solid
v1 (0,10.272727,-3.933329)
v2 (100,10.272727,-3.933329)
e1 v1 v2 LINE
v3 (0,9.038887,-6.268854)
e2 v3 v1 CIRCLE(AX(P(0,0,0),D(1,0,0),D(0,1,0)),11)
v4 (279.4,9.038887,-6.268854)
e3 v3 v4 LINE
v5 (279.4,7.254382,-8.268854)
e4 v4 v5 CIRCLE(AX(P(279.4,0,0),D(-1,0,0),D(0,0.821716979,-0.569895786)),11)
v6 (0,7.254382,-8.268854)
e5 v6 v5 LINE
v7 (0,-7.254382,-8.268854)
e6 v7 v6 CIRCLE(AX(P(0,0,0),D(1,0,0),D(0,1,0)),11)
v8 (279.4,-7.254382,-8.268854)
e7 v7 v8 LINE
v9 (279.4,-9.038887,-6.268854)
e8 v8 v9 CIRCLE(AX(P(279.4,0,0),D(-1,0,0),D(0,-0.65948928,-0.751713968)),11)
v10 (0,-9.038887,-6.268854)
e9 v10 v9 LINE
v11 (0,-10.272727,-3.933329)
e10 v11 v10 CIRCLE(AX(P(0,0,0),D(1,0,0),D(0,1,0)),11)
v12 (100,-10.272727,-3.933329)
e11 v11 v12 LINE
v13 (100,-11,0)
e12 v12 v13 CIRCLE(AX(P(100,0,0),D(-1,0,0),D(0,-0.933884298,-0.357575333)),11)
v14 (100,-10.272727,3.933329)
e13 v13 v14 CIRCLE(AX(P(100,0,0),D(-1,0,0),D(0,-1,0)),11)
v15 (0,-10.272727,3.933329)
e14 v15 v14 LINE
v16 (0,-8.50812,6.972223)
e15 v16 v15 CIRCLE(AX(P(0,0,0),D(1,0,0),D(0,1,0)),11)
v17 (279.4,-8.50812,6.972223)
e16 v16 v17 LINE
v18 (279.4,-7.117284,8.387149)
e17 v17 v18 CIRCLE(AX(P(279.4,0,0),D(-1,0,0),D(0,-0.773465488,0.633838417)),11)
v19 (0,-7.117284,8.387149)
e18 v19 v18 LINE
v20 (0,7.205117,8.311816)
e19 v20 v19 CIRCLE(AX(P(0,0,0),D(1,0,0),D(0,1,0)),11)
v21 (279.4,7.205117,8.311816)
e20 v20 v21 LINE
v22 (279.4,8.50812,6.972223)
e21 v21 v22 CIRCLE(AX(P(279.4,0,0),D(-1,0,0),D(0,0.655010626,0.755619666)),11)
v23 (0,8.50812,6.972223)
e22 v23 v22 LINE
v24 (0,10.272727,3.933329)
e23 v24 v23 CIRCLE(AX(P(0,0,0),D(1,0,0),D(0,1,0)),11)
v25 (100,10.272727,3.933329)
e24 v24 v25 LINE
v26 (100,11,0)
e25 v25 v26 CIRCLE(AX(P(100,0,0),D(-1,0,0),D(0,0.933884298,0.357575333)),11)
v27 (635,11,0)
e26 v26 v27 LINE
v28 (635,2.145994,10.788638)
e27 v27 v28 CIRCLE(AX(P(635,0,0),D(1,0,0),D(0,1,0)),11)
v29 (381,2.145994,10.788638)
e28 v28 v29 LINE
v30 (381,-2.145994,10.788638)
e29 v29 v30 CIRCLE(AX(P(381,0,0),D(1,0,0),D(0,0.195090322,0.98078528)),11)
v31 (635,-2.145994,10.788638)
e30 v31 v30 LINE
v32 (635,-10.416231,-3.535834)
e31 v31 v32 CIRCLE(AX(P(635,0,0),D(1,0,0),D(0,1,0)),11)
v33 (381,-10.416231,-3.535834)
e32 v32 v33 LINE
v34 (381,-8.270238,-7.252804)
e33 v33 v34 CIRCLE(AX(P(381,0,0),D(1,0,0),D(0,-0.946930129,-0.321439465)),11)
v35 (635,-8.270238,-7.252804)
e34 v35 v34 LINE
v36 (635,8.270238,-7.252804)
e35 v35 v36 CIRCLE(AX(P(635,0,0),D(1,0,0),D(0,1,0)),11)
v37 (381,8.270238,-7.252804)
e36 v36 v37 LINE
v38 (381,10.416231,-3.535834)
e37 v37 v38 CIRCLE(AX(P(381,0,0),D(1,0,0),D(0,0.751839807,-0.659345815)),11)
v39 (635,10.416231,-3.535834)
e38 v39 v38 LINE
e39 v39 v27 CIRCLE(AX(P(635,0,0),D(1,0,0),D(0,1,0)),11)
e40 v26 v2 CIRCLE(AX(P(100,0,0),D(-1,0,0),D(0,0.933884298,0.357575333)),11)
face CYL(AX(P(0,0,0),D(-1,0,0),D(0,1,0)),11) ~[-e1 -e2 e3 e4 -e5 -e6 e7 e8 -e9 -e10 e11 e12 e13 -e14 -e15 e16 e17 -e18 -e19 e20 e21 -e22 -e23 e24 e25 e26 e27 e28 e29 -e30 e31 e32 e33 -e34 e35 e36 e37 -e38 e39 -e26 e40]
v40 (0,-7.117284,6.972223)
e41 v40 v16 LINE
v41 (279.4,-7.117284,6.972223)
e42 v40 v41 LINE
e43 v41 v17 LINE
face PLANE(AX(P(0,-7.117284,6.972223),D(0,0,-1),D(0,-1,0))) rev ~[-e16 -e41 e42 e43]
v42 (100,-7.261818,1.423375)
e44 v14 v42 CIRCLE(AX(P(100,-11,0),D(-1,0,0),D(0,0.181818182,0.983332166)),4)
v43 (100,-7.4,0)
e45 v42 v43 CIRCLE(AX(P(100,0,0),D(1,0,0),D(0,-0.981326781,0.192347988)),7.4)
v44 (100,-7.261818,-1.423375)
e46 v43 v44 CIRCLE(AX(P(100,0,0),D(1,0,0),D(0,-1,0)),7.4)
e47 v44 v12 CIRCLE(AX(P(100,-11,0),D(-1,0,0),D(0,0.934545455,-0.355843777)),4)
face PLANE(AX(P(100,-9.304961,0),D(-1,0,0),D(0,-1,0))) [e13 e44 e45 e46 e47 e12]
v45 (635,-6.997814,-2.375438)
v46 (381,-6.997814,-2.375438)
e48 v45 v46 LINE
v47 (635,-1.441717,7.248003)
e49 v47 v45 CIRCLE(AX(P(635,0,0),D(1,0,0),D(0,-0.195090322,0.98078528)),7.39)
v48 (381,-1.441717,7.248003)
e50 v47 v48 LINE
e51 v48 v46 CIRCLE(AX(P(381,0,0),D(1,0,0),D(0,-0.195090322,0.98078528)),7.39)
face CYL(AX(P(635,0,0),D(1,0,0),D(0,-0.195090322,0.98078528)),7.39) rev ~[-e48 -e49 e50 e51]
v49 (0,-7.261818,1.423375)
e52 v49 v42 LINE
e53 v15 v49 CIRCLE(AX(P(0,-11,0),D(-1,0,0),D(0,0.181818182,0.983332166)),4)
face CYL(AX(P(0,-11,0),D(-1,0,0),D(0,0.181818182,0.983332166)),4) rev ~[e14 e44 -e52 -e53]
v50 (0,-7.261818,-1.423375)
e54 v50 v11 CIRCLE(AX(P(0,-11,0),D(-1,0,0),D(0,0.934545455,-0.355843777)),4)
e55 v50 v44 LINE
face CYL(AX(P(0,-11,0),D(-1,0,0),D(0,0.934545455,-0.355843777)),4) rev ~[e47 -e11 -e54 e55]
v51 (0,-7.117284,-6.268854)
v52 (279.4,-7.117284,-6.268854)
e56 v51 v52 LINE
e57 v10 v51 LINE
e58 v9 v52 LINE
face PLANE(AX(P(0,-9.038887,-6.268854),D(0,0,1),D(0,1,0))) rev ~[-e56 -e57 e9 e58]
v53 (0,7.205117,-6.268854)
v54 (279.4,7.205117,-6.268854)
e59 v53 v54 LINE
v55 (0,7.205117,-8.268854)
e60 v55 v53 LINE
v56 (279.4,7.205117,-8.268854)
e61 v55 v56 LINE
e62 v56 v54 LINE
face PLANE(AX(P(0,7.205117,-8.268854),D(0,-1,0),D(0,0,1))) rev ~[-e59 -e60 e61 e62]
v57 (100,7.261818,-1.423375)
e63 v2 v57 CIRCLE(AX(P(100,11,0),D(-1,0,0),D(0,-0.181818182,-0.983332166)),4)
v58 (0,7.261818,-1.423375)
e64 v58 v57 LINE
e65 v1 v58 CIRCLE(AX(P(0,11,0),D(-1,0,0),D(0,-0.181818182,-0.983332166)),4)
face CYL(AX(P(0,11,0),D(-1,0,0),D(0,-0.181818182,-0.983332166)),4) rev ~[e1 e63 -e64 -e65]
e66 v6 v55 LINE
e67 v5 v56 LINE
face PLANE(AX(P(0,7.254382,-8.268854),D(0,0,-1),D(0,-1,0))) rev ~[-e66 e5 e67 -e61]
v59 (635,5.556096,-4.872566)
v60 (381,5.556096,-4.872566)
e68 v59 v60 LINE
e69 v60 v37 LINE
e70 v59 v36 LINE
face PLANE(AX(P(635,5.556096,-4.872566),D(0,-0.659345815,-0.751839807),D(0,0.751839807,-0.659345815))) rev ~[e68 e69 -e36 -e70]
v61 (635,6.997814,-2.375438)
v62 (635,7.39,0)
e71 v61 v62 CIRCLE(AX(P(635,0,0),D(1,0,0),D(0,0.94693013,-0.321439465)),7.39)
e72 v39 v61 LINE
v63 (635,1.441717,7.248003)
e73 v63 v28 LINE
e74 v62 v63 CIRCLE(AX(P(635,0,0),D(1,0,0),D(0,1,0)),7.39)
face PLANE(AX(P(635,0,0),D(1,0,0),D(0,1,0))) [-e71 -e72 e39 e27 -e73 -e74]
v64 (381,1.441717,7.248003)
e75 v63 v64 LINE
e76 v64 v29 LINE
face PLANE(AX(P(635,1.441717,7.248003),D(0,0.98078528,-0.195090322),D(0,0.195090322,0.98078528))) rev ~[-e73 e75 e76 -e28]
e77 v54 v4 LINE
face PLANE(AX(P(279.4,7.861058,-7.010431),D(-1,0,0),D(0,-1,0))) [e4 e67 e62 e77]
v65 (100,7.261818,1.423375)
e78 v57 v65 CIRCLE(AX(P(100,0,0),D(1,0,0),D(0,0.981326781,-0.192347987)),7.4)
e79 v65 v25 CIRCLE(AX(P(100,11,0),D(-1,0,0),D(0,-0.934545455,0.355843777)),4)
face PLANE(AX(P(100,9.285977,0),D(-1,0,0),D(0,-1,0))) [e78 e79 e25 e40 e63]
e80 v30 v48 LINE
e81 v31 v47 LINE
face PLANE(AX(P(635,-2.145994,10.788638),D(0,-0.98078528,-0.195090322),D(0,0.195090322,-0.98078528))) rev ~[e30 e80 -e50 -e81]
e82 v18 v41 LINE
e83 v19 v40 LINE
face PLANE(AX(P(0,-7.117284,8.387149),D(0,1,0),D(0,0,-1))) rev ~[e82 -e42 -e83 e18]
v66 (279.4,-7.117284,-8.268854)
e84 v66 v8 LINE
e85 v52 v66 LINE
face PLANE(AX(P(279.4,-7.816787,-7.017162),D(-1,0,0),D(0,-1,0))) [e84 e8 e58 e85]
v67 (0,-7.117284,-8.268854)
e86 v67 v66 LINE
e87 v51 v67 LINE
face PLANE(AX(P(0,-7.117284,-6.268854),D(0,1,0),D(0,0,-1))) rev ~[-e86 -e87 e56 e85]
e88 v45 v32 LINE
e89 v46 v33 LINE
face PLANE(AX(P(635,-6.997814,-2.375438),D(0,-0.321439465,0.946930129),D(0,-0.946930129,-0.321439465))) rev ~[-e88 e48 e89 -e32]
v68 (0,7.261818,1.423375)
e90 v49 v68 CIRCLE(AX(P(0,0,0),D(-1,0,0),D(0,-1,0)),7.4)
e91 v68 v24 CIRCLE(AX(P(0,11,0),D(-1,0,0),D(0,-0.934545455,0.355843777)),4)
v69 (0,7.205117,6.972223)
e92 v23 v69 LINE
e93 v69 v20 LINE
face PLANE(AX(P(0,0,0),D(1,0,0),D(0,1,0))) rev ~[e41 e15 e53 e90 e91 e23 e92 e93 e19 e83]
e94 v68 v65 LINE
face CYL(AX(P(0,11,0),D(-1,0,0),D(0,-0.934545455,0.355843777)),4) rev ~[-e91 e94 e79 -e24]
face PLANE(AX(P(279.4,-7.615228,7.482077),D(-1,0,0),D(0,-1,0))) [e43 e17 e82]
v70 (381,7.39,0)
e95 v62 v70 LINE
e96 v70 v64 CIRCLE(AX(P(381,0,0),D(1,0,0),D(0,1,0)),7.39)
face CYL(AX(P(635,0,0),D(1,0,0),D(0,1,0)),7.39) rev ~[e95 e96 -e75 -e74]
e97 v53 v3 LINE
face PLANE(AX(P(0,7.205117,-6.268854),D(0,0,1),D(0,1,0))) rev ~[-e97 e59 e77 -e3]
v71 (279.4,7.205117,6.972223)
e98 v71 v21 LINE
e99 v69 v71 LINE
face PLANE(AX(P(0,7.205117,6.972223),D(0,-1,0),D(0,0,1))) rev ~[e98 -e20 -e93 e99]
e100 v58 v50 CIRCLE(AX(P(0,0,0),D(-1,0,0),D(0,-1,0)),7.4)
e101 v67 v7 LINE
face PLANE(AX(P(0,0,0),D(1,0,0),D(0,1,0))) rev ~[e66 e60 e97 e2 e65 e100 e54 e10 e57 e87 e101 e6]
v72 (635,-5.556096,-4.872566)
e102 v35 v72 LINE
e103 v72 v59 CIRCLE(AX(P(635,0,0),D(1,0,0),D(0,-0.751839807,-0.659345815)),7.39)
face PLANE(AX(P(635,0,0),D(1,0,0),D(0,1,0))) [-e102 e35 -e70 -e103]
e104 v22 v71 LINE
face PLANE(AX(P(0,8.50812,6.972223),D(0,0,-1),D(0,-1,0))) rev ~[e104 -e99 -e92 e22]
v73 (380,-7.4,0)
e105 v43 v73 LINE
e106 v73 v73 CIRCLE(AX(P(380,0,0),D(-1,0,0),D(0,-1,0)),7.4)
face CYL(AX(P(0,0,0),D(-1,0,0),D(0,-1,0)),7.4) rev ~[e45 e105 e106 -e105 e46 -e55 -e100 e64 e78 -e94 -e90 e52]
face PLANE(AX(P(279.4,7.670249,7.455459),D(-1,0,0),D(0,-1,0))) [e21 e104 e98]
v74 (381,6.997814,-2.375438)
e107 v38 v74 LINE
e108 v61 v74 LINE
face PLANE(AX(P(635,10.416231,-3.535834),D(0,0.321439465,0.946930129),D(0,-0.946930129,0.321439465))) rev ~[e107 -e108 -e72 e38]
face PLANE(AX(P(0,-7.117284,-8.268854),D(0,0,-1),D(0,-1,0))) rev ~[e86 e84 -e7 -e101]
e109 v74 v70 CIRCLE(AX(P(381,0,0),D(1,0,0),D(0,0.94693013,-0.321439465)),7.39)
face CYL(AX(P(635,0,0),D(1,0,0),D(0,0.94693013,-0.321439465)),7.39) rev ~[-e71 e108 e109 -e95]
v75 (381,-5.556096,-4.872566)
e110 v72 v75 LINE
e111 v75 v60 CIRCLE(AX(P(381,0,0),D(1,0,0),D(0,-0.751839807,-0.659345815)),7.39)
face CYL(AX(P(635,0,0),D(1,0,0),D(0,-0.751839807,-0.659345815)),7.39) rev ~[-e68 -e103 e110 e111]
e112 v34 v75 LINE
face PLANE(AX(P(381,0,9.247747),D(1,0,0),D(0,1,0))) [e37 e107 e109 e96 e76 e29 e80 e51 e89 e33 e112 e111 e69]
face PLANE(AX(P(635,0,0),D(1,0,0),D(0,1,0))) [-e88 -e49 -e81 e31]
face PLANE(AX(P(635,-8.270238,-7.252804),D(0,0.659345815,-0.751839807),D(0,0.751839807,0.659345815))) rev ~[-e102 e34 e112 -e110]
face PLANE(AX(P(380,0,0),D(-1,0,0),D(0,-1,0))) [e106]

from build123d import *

# Parameters (mm, degrees)
F0_R     = 11
F1_DEPTH = 635
F3_DEPTH = 254
F4_R     = 7.4
F5_DEPTH = 380
F7_DEPTH = 279.4
F8_DEPTH = 100


with BuildPart() as f1:
    # F0 (on Right) → F1 (new body)
    with BuildSketch(Plane.YZ):
        Circle(F0_R)
    extrude(amount=F1_DEPTH)

    # F2 (on face) → F3 (cut)
    with BuildSketch(Plane.YZ.offset(635)):
        with BuildLine():
            ThreePointArc((0, 7.39), (0.724346667, 7.3544151301), (1.4417174797, 7.2480032222))
            Line((1.4417174797, 7.2480032222), (2.1459935422, 10.7886380844))
            ThreePointArc((2.1459935422, 10.7886380844), (0, 11), (-2.1459935422, 10.7886380844))
            Line((-2.1459935422, 10.7886380844), (-1.4417174797, 7.2480032222))
            ThreePointArc((-1.4417174797, 7.2480032222), (-0.724346667, 7.3544151301), (0, 7.39))
        make_face()
        with BuildLine():
            Line((-6.997813657, -2.3754376486), (0, 0))
            Line((0, 0), (-1.4417174797, 7.2480032222))
            ThreePointArc((-1.4417174797, 7.2480032222), (-6.399927734, 3.695), (-6.997813657, -2.3754376486))
        make_face()
        with BuildLine():
            Line((-5.5560961773, -4.8725655736), (0, 0))
            Line((0, 0), (-6.997813657, -2.3754376486))
            ThreePointArc((-6.997813657, -2.3754376486), (-6.399927734, -3.695), (-5.5560961773, -4.8725655736))
        make_face()
        with BuildLine():
            Line((5.5560961773, -4.8725655736), (0, 0))
            Line((0, 0), (-5.5560961773, -4.8725655736))
            ThreePointArc((-5.5560961773, -4.8725655736), (0, -7.39), (5.5560961773, -4.8725655736))
        make_face()
        with BuildLine():
            ThreePointArc((5.5560961773, -4.8725655736), (6.399927734, -3.695), (6.997813657, -2.3754376486))
            Line((6.997813657, -2.3754376486), (0, 0))
            Line((0, 0), (5.5560961773, -4.8725655736))
        make_face()
        with BuildLine():
            ThreePointArc((6.997813657, -2.3754376486), (7.2912942241, -1.2037975484), (7.39, 0))
            ThreePointArc((7.39, 0), (5.7125472504, 4.68816637), (1.4417174797, 7.2480032222))
            Line((1.4417174797, 7.2480032222), (0, 0))
            Line((0, 0), (6.997813657, -2.3754376486))
        make_face()
        with BuildLine():
            Line((0, 0), (1.4417174797, 7.2480032222))
            ThreePointArc((1.4417174797, 7.2480032222), (0.724346667, 7.3544151301), (0, 7.39))
            Line((0, 7.39), (0, 0))
        make_face()
        with BuildLine():
            Line((0, 0), (0, 7.39))
            ThreePointArc((0, 7.39), (-0.724346667, 7.3544151301), (-1.4417174797, 7.2480032222))
            Line((-1.4417174797, 7.2480032222), (0, 0))
        make_face()
        with BuildLine():
            ThreePointArc((-5.5560961773, -4.8725655736), (-6.399927734, -3.695), (-6.997813657, -2.3754376486))
            Line((-6.997813657, -2.3754376486), (-10.4162314244, -3.5358341183))
            ThreePointArc((-10.4162314244, -3.5358341183), (-9.5262794416, -5.5), (-8.2702378823, -7.2528039661))
            Line((-8.2702378823, -7.2528039661), (-5.5560961773, -4.8725655736))
        make_face()
        with BuildLine():
            Line((10.4162314244, -3.5358341183), (6.997813657, -2.3754376486))
            ThreePointArc((6.997813657, -2.3754376486), (6.399927734, -3.695), (5.5560961773, -4.8725655736))
            Line((5.5560961773, -4.8725655736), (8.2702378823, -7.2528039661))
            ThreePointArc((8.2702378823, -7.2528039661), (9.5262794416, -5.5), (10.4162314244, -3.5358341183))
        make_face()
    extrude(amount=-F3_DEPTH, mode=Mode.SUBTRACT)

    # F4 (on face) → F5 (cut)
    with BuildSketch(Plane(origin=(0, 0, 0), x_dir=(0, -1, 0), z_dir=(-1, 0, 0))):
        Circle(F4_R)
    extrude(amount=-F5_DEPTH, mode=Mode.SUBTRACT)

    # F6 (on face) → F7 (cut)
    with BuildSketch(Plane(origin=(0, 0, 0), x_dir=(0, -1, 0), z_dir=(-1, 0, 0))):
        with BuildLine():
            Line((7.1172844619, 8.3871486149), (7.1172844619, 6.972222589))
            Line((7.1172844619, 6.972222589), (8.5081203665, 6.972222589))
            ThreePointArc((8.5081203665, 6.972222589), (7.8446684396, 7.7111073831), (7.1172844619, 8.3871486149))
        make_face()
        with BuildLine():
            ThreePointArc((-9.0388867634, -6.2688536495), (-8.2077799909, -7.3234109281), (-7.2543820773, -8.2688536495))
            Line((-7.2543820773, -8.2688536495), (-7.2051168904, -8.2688536495))
            Line((-7.2051168904, -8.2688536495), (-7.2051168904, -6.2688536495))
            Line((-7.2051168904, -6.2688536495), (-9.0388867634, -6.2688536495))
        make_face()
        with BuildLine():
            ThreePointArc((7.2543820773, -8.2688536495), (8.2077799909, -7.3234109281), (9.0388867634, -6.2688536495))
            Line((9.0388867634, -6.2688536495), (7.1172844619, -6.2688536495))
            Line((7.1172844619, -6.2688536495), (7.1172844619, -8.2688536495))
            Line((7.1172844619, -8.2688536495), (7.2543820773, -8.2688536495))
        make_face()
        with BuildLine():
            Line((-7.2051168904, 6.972222589), (-7.2051168904, 8.3118163235))
            ThreePointArc((-7.2051168904, 8.3118163235), (-7.8851178885, 7.6697402749), (-8.5081203665, 6.972222589))
            Line((-8.5081203665, 6.972222589), (-7.2051168904, 6.972222589))
        make_face()
    extrude(amount=-F7_DEPTH, mode=Mode.SUBTRACT)

    # F6 (on face) → F8 (cut)
    with BuildSketch(Plane(origin=(0, 0, 0), x_dir=(0, -1, 0), z_dir=(-1, 0, 0))):
        with BuildLine():
            ThreePointArc((11, 0), (10.8166538264, 2), (10.2727272727, 3.9333286641))
            ThreePointArc((10.2727272727, 3.9333286641), (8.4387429279, 3.0724521494), (7.2618181818, 1.4233751066))
            ThreePointArc((7.2618181818, 1.4233751066), (7.3653735325, 0.7150333749), (7.4, 0))
            ThreePointArc((7.4, 0), (7.3653735325, -0.7150333749), (7.2618181818, -1.4233751066))
            ThreePointArc((7.2618181818, -1.4233751066), (8.4387429279, -3.0724521494), (10.2727272727, -3.9333286641))
            ThreePointArc((10.2727272727, -3.9333286641), (10.8166538264, -2), (11, 0))
        make_face()
        with BuildLine():
            ThreePointArc((-7.2618181818, -1.4233751066), (-7.4, 0), (-7.2618181818, 1.4233751066))
            ThreePointArc((-7.2618181818, 1.4233751066), (-8.4387429279, 3.0724521494), (-10.2727272727, 3.9333286641))
            ThreePointArc((-10.2727272727, 3.9333286641), (-11, 0), (-10.2727272727, -3.9333286641))
            ThreePointArc((-10.2727272727, -3.9333286641), (-8.4387429279, -3.0724521494), (-7.2618181818, -1.4233751066))
        make_face()
    extrude(amount=-F8_DEPTH, mode=Mode.SUBTRACT)


solid = f1.part
